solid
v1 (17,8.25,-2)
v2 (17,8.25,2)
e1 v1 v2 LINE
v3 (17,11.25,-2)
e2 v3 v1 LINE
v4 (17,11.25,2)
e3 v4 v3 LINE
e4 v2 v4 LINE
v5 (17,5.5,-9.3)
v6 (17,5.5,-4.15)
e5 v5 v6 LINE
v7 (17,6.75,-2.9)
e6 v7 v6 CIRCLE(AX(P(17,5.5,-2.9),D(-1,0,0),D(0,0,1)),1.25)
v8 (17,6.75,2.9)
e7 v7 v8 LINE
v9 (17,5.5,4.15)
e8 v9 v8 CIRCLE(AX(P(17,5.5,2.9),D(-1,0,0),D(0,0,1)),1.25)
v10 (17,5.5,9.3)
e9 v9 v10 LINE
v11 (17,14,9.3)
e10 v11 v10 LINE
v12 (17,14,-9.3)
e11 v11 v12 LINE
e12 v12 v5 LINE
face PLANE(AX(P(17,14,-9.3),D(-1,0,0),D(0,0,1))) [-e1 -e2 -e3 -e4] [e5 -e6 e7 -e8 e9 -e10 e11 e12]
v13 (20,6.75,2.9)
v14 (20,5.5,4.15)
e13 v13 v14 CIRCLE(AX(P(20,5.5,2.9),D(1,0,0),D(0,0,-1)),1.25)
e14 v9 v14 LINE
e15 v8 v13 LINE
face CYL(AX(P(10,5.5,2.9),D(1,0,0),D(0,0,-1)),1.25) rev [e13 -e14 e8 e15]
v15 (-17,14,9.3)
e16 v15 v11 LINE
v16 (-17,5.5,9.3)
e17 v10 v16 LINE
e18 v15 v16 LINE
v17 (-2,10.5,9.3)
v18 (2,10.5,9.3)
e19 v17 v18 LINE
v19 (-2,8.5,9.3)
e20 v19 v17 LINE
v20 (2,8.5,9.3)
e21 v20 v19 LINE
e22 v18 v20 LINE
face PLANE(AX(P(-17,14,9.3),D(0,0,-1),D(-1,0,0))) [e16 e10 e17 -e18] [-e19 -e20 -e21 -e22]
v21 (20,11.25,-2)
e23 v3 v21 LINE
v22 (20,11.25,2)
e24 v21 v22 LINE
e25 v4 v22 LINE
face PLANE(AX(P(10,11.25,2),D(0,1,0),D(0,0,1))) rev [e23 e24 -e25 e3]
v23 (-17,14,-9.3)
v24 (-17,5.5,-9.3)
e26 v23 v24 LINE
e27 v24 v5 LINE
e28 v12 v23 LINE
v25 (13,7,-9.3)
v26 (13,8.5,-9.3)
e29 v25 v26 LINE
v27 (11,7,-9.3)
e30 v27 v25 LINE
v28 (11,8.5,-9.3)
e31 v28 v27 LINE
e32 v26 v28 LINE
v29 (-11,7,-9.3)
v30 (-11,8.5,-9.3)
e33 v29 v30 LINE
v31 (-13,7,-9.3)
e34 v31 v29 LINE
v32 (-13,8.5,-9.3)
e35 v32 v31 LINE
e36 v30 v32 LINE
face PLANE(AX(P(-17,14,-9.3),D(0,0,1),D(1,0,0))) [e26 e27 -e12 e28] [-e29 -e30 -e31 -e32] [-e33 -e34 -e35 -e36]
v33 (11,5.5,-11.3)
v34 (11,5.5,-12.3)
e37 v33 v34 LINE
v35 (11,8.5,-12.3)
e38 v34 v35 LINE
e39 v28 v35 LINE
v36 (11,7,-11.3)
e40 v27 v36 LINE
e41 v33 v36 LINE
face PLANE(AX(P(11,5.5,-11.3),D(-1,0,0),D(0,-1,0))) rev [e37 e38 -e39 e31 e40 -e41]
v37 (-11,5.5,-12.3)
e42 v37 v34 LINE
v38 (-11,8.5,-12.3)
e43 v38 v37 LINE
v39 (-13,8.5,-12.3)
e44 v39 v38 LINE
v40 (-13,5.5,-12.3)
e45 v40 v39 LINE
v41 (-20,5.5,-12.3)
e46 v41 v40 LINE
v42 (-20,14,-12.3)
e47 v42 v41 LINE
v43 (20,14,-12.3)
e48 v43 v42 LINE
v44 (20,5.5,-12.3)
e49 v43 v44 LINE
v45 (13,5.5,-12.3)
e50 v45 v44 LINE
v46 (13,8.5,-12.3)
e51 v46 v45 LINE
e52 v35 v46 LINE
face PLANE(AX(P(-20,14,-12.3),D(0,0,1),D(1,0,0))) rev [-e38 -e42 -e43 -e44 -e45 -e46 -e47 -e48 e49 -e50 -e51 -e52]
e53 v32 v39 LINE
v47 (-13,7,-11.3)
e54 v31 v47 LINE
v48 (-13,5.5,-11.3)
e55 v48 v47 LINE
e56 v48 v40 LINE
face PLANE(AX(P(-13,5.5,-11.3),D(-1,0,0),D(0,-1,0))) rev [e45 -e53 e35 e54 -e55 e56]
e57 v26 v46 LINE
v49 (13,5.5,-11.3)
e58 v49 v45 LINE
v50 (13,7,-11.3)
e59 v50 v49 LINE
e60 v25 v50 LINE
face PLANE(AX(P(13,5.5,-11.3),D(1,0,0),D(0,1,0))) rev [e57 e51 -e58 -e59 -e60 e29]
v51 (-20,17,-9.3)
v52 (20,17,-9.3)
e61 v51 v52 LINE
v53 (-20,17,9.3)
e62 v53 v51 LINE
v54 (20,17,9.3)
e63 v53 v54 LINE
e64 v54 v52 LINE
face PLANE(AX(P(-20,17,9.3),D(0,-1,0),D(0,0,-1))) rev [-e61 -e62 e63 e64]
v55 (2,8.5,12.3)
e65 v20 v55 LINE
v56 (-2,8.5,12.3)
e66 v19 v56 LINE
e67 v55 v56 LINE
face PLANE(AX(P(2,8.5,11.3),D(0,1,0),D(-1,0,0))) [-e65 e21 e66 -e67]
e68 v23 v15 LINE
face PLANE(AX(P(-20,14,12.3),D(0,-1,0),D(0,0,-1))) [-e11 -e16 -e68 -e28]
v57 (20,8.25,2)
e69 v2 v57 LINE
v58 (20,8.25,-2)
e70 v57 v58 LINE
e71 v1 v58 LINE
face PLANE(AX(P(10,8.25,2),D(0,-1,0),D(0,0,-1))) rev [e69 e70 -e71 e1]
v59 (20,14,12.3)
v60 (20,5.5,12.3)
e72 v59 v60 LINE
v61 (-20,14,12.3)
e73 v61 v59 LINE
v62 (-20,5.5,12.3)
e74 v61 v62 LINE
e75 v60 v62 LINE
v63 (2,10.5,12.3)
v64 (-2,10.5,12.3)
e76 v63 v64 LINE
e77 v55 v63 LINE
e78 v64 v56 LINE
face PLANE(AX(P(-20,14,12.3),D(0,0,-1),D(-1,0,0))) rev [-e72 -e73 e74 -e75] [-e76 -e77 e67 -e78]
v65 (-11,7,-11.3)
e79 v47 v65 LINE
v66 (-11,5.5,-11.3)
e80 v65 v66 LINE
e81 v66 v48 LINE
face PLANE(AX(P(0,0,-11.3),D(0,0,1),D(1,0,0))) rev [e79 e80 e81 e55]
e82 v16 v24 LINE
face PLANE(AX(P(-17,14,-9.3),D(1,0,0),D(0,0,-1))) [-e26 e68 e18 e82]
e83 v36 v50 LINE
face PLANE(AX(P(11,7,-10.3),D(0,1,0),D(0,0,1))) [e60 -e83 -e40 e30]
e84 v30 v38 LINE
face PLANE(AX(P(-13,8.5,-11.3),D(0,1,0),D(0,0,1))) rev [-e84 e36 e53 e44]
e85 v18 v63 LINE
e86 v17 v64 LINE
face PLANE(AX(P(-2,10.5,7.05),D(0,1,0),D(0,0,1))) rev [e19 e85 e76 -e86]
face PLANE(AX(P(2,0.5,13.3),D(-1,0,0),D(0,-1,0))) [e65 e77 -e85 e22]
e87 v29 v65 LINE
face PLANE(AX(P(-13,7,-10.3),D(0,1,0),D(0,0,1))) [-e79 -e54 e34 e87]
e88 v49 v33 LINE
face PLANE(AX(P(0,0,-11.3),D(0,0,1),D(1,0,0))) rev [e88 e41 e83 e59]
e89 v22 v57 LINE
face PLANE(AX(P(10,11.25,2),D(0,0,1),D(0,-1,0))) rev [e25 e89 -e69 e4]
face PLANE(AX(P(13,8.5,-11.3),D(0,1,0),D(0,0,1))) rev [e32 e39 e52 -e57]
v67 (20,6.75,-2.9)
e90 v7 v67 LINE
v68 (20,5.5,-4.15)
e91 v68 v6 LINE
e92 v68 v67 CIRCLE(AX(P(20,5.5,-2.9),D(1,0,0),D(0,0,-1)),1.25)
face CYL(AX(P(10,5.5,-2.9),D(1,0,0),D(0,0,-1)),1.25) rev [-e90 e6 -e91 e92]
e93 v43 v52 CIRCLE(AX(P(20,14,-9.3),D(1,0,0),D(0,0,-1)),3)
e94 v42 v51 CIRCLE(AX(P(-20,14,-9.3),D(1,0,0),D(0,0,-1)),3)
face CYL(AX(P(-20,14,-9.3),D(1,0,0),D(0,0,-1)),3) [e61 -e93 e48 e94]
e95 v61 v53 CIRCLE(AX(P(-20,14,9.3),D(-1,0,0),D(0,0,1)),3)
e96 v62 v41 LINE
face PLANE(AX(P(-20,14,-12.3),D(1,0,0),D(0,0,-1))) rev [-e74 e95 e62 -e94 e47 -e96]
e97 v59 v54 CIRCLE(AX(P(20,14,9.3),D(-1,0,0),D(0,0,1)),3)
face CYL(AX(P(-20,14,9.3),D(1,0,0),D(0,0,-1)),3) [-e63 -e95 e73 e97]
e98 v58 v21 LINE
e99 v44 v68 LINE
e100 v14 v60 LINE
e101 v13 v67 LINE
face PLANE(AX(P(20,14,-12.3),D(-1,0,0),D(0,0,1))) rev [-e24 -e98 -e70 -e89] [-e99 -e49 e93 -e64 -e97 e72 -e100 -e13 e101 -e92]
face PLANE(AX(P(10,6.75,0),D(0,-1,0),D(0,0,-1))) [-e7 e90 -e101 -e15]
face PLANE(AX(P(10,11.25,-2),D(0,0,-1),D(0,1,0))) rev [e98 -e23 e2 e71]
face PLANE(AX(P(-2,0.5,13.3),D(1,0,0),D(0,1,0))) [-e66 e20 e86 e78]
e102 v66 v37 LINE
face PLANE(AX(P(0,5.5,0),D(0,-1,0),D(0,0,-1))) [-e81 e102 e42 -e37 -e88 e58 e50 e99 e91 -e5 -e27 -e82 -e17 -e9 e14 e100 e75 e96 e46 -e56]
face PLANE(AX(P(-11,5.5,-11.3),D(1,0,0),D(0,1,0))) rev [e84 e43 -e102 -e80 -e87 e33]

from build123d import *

# Parameters (mm, degrees)
SKETCH1_W            = 40
SKETCH1_H            = 24.6
SKETCH1_W_2          = 34
SKETCH1_H_2          = 18.6
BOSS_EXTRUDE1_DEPTH  = 14
CUT_EXTRUDE1_DEPTH   = 10
SKETCH5_W            = 4
SKETCH5_H            = 3
CUT_EXTRUDE2_DEPTH   = 10
BOSS_EXTRUDE2_DEPTH  = 40
BOSS_EXTRUDE3_DEPTH  = 40
SKETCH8_W            = 4
SKETCH8_H            = 12
BOSS_EXTRUDE4_DEPTH  = 1
FILLET4_R            = 21
SKETCH10_W           = 4
SKETCH10_H           = 2
BOSS_EXTRUDE6_DEPTH  = 1
SKETCH13_W           = 2
SKETCH13_H           = 3
BOSS_EXTRUDE7_DEPTH  = 1
SKETCH14_W           = 2
SKETCH14_H           = 1.5
BOSS_EXTRUDE9_DEPTH  = 1
SKETCH14_4_W         = 2
SKETCH14_4_H         = 1.5
BOSS_EXTRUDE10_DEPTH = 1
CUT_EXTRUDE5_DEPTH   = 28
CUT_EXTRUDE6_DEPTH   = 28
FILLET7_R            = 0.25
SKETCH18_W           = 34
SKETCH18_H           = 18.6
BOSS_EXTRUDE11_DEPTH = 1.25
CUT_EXTRUDE7_DEPTH   = 5.25
SKETCH20_W           = 4
SKETCH20_H           = 2
CUT_EXTRUDE8_DEPTH   = 5.25
SKETCH21_W           = 2
SKETCH21_H           = 1.5
CUT_EXTRUDE9_DEPTH   = 5.25


with BuildPart() as part:
    # Sketch1 → Boss-Extrude1 (new body)
    with BuildSketch(Plane(origin=(0, 0, 0), x_dir=(1, 0, 0), z_dir=(0, 1, 0))):
        Rectangle(SKETCH1_W, SKETCH1_H)
        Rectangle(SKETCH1_W_2, SKETCH1_H_2, mode=Mode.SUBTRACT)
    extrude(amount=BOSS_EXTRUDE1_DEPTH)

    # Sketch3 → Cut-Extrude1 (cut)
    with BuildSketch(Plane(origin=(20, 0, 0), x_dir=(0, 0, -1), z_dir=(1, 0, 0))):
        with BuildLine():
            ThreePointArc((2.9, 4.25), (4.15, 5.5), (2.9, 6.75))
            Line((2.9, 6.75), (-2.9, 6.75))
            ThreePointArc((-2.9, 6.75), (-4.15, 5.5), (-2.9, 4.25))
            Line((-2.9, 4.25), (2.9, 4.25))
        make_face()
    extrude(amount=-CUT_EXTRUDE1_DEPTH, mode=Mode.SUBTRACT)


with BuildPart() as body_2:
    # Split1: the piece on the far side of the plane
    add(part.part)
    split(bisect_by=Plane(origin=(0, 5.5, 0), x_dir=(0, 0, -1), z_dir=(0, -1, 0)), keep=Keep.BOTTOM)

    # Sketch5 → Cut-Extrude2 (cut)
    with BuildSketch(Plane(origin=(20, 0, 0), x_dir=(0, 0, -1), z_dir=(1, 0, 0))):
        with Locations((0, 9.75)):
            Rectangle(SKETCH5_W, SKETCH5_H)
    extrude(amount=-CUT_EXTRUDE2_DEPTH, mode=Mode.SUBTRACT)

    # Sketch6 → Boss-Extrude2 (add)
    with BuildSketch(Plane(origin=(20, 0, 0), x_dir=(0, 0, -1), z_dir=(1, 0, 0))):
        with BuildLine():
            Line((-9.3, 17), (9.3, 17))
            ThreePointArc((9.3, 17), (11.421320344, 16.121320344), (12.3, 14))
            Line((12.3, 14), (-12.3, 14))
            ThreePointArc((-12.3, 14), (-11.421320344, 16.121320344), (-9.3, 17))
        make_face()
    extrude(amount=-BOSS_EXTRUDE2_DEPTH)


with BuildPart() as part_1:
    add(part.part)

    # Split1
    split(bisect_by=Plane(origin=(0, 5.5, 0), x_dir=(0, 0, -1), z_dir=(0, -1, 0)), keep=Keep.TOP)

    # Sketch7 → Boss-Extrude3 (add)
    with BuildSketch(Plane.ZY.offset(20)):
        with BuildLine():
            Line((-9.3, -3), (9.3, -3))
            ThreePointArc((9.3, -3), (11.421320344, -2.121320344), (12.3, 0))
            Line((12.3, 0), (-12.3, 0))
            ThreePointArc((-12.3, 0), (-11.421320344, -2.121320344), (-9.3, -3))
        make_face()
    extrude(amount=-BOSS_EXTRUDE3_DEPTH)

    # Sketch8 → Boss-Extrude4 (add)
    with BuildSketch(Plane.XY.offset(12.3)):
        with Locations((0, 6.5)):
            Rectangle(SKETCH8_W, SKETCH8_H)
    extrude(amount=BOSS_EXTRUDE4_DEPTH)

    # Fillet4
    # the kernel refuses this fillet: 21 mm, written as the material it takes off along each edge
    with BuildSketch(Plane(origin=(18.007810594, 0.5, 13.3), x_dir=(0, 0, -1), z_dir=(-1, 0, 0))) as fillet4_piece_1:
        with BuildLine():
            CenterArc((21, -6.403124237), FILLET4_R, 162.247209838, 17.752790162)
            Line((0, -6.403124237), (-0.42, -6.403124237))
            Line((-0.42, -6.403124237), (-0.42, 0))
            Line((-0.42, 0), (0, 0.42))
            ThreePointArc((0, 0.42), (0.5, 0.42), (0.6, 0.128062485))
            Line((0.6, 0.128062485), (1, 0))
        make_face()
    extrude(amount=36.015621187, mode=Mode.SUBTRACT)

    # Sketch10 → Boss-Extrude6 (add)
    with BuildSketch(Plane(origin=(0, 0, 12.3), x_dir=(-1, 0, 0), z_dir=(0, 0, -1))):
        with Locations((0, 9.5)):
            Rectangle(SKETCH10_W, SKETCH10_H)
    extrude(amount=BOSS_EXTRUDE6_DEPTH)

    # Sketch13 → Boss-Extrude7 (add)
    with BuildSketch(Plane(origin=(0, 0, -12.3), x_dir=(-1, 0, 0), z_dir=(0, 0, -1))):
        with Locations((-12, 7)):
            Rectangle(SKETCH13_W, SKETCH13_H)
        with Locations((12, 7)):
            Rectangle(SKETCH13_W, SKETCH13_H)
    extrude(amount=-BOSS_EXTRUDE7_DEPTH)

    # Sketch14 → Boss-Extrude9 (add)
    with BuildSketch(Plane.XY.offset(-11.3)):
        with Locations((12, 7.75)):
            Rectangle(SKETCH14_W, SKETCH14_H)
    extrude(amount=BOSS_EXTRUDE9_DEPTH)

    # Sketch14<4> → Boss-Extrude10 (add)
    with BuildSketch(Plane.XY.offset(-11.3)):
        with Locations((-12, 7.75)):
            Rectangle(SKETCH14_4_W, SKETCH14_4_H)
        with Locations((12, 7.75)):
            Rectangle(SKETCH14_4_W, SKETCH14_4_H)
    extrude(amount=BOSS_EXTRUDE10_DEPTH)

    # Sketch15 → Cut-Extrude5 (cut)
    with BuildSketch(Plane(origin=(13, 0, 0), x_dir=(0, 0, -1), z_dir=(1, 0, 0))):
        Polygon((10.3, 7), (11.3, 8.5), (10.3, 8.5), align=None)
    extrude(amount=-CUT_EXTRUDE5_DEPTH, mode=Mode.SUBTRACT)

    # Sketch16 → Cut-Extrude6 (cut)
    with BuildSketch(Plane(origin=(2, 0, 0), x_dir=(0, 0, -1), z_dir=(1, 0, 0))):
        Polygon((-13.3, 12.5), (-12.3, 10.5), (-12.3, 12.5), align=None)
    extrude(amount=-CUT_EXTRUDE6_DEPTH, mode=Mode.SUBTRACT)

    # Fillet7
    fillet7_edges = [part_1.edges().sort_by_distance(p)[0] for p in [
        (0, 12.5, 13.3),
    ]]
    fillet(fillet7_edges, radius=FILLET7_R)

    # Sketch18 → Boss-Extrude11 (add)
    with BuildSketch(Plane(origin=(0, 0, 0), x_dir=(1, 0, 0), z_dir=(0, 1, 0))):
        Rectangle(SKETCH18_W, SKETCH18_H)
    extrude(amount=BOSS_EXTRUDE11_DEPTH)

    # Sketch19 → Cut-Extrude7 (cut)
    with BuildSketch(Plane.ZY.offset(2)):
        Polygon((12.3, 10.5), (11.3, 8.5), (11.3, 10.5), align=None)
    extrude(amount=-CUT_EXTRUDE7_DEPTH, mode=Mode.SUBTRACT)


with BuildPart() as body_2_1:
    add(body_2.part)

    # Combine3: cut part
    add(part_1.part, mode=Mode.SUBTRACT)

    # Sketch20 → Cut-Extrude8 (cut)
    with BuildSketch(Plane.XY.offset(12.3)):
        with Locations((0, 9.5)):
            Rectangle(SKETCH20_W, SKETCH20_H)
    extrude(amount=-CUT_EXTRUDE8_DEPTH, mode=Mode.SUBTRACT)

    # Sketch21 → Cut-Extrude9 (cut)
    with BuildSketch(Plane(origin=(0, 0, -12.3), x_dir=(-1, 0, 0), z_dir=(0, 0, -1))):
        with Locations((-12, 7.75)):
            Rectangle(SKETCH21_W, SKETCH21_H)
        with Locations((12, 7.75)):
            Rectangle(SKETCH21_W, SKETCH21_H)
    extrude(amount=-CUT_EXTRUDE9_DEPTH, mode=Mode.SUBTRACT)


solid = body_2_1.part
